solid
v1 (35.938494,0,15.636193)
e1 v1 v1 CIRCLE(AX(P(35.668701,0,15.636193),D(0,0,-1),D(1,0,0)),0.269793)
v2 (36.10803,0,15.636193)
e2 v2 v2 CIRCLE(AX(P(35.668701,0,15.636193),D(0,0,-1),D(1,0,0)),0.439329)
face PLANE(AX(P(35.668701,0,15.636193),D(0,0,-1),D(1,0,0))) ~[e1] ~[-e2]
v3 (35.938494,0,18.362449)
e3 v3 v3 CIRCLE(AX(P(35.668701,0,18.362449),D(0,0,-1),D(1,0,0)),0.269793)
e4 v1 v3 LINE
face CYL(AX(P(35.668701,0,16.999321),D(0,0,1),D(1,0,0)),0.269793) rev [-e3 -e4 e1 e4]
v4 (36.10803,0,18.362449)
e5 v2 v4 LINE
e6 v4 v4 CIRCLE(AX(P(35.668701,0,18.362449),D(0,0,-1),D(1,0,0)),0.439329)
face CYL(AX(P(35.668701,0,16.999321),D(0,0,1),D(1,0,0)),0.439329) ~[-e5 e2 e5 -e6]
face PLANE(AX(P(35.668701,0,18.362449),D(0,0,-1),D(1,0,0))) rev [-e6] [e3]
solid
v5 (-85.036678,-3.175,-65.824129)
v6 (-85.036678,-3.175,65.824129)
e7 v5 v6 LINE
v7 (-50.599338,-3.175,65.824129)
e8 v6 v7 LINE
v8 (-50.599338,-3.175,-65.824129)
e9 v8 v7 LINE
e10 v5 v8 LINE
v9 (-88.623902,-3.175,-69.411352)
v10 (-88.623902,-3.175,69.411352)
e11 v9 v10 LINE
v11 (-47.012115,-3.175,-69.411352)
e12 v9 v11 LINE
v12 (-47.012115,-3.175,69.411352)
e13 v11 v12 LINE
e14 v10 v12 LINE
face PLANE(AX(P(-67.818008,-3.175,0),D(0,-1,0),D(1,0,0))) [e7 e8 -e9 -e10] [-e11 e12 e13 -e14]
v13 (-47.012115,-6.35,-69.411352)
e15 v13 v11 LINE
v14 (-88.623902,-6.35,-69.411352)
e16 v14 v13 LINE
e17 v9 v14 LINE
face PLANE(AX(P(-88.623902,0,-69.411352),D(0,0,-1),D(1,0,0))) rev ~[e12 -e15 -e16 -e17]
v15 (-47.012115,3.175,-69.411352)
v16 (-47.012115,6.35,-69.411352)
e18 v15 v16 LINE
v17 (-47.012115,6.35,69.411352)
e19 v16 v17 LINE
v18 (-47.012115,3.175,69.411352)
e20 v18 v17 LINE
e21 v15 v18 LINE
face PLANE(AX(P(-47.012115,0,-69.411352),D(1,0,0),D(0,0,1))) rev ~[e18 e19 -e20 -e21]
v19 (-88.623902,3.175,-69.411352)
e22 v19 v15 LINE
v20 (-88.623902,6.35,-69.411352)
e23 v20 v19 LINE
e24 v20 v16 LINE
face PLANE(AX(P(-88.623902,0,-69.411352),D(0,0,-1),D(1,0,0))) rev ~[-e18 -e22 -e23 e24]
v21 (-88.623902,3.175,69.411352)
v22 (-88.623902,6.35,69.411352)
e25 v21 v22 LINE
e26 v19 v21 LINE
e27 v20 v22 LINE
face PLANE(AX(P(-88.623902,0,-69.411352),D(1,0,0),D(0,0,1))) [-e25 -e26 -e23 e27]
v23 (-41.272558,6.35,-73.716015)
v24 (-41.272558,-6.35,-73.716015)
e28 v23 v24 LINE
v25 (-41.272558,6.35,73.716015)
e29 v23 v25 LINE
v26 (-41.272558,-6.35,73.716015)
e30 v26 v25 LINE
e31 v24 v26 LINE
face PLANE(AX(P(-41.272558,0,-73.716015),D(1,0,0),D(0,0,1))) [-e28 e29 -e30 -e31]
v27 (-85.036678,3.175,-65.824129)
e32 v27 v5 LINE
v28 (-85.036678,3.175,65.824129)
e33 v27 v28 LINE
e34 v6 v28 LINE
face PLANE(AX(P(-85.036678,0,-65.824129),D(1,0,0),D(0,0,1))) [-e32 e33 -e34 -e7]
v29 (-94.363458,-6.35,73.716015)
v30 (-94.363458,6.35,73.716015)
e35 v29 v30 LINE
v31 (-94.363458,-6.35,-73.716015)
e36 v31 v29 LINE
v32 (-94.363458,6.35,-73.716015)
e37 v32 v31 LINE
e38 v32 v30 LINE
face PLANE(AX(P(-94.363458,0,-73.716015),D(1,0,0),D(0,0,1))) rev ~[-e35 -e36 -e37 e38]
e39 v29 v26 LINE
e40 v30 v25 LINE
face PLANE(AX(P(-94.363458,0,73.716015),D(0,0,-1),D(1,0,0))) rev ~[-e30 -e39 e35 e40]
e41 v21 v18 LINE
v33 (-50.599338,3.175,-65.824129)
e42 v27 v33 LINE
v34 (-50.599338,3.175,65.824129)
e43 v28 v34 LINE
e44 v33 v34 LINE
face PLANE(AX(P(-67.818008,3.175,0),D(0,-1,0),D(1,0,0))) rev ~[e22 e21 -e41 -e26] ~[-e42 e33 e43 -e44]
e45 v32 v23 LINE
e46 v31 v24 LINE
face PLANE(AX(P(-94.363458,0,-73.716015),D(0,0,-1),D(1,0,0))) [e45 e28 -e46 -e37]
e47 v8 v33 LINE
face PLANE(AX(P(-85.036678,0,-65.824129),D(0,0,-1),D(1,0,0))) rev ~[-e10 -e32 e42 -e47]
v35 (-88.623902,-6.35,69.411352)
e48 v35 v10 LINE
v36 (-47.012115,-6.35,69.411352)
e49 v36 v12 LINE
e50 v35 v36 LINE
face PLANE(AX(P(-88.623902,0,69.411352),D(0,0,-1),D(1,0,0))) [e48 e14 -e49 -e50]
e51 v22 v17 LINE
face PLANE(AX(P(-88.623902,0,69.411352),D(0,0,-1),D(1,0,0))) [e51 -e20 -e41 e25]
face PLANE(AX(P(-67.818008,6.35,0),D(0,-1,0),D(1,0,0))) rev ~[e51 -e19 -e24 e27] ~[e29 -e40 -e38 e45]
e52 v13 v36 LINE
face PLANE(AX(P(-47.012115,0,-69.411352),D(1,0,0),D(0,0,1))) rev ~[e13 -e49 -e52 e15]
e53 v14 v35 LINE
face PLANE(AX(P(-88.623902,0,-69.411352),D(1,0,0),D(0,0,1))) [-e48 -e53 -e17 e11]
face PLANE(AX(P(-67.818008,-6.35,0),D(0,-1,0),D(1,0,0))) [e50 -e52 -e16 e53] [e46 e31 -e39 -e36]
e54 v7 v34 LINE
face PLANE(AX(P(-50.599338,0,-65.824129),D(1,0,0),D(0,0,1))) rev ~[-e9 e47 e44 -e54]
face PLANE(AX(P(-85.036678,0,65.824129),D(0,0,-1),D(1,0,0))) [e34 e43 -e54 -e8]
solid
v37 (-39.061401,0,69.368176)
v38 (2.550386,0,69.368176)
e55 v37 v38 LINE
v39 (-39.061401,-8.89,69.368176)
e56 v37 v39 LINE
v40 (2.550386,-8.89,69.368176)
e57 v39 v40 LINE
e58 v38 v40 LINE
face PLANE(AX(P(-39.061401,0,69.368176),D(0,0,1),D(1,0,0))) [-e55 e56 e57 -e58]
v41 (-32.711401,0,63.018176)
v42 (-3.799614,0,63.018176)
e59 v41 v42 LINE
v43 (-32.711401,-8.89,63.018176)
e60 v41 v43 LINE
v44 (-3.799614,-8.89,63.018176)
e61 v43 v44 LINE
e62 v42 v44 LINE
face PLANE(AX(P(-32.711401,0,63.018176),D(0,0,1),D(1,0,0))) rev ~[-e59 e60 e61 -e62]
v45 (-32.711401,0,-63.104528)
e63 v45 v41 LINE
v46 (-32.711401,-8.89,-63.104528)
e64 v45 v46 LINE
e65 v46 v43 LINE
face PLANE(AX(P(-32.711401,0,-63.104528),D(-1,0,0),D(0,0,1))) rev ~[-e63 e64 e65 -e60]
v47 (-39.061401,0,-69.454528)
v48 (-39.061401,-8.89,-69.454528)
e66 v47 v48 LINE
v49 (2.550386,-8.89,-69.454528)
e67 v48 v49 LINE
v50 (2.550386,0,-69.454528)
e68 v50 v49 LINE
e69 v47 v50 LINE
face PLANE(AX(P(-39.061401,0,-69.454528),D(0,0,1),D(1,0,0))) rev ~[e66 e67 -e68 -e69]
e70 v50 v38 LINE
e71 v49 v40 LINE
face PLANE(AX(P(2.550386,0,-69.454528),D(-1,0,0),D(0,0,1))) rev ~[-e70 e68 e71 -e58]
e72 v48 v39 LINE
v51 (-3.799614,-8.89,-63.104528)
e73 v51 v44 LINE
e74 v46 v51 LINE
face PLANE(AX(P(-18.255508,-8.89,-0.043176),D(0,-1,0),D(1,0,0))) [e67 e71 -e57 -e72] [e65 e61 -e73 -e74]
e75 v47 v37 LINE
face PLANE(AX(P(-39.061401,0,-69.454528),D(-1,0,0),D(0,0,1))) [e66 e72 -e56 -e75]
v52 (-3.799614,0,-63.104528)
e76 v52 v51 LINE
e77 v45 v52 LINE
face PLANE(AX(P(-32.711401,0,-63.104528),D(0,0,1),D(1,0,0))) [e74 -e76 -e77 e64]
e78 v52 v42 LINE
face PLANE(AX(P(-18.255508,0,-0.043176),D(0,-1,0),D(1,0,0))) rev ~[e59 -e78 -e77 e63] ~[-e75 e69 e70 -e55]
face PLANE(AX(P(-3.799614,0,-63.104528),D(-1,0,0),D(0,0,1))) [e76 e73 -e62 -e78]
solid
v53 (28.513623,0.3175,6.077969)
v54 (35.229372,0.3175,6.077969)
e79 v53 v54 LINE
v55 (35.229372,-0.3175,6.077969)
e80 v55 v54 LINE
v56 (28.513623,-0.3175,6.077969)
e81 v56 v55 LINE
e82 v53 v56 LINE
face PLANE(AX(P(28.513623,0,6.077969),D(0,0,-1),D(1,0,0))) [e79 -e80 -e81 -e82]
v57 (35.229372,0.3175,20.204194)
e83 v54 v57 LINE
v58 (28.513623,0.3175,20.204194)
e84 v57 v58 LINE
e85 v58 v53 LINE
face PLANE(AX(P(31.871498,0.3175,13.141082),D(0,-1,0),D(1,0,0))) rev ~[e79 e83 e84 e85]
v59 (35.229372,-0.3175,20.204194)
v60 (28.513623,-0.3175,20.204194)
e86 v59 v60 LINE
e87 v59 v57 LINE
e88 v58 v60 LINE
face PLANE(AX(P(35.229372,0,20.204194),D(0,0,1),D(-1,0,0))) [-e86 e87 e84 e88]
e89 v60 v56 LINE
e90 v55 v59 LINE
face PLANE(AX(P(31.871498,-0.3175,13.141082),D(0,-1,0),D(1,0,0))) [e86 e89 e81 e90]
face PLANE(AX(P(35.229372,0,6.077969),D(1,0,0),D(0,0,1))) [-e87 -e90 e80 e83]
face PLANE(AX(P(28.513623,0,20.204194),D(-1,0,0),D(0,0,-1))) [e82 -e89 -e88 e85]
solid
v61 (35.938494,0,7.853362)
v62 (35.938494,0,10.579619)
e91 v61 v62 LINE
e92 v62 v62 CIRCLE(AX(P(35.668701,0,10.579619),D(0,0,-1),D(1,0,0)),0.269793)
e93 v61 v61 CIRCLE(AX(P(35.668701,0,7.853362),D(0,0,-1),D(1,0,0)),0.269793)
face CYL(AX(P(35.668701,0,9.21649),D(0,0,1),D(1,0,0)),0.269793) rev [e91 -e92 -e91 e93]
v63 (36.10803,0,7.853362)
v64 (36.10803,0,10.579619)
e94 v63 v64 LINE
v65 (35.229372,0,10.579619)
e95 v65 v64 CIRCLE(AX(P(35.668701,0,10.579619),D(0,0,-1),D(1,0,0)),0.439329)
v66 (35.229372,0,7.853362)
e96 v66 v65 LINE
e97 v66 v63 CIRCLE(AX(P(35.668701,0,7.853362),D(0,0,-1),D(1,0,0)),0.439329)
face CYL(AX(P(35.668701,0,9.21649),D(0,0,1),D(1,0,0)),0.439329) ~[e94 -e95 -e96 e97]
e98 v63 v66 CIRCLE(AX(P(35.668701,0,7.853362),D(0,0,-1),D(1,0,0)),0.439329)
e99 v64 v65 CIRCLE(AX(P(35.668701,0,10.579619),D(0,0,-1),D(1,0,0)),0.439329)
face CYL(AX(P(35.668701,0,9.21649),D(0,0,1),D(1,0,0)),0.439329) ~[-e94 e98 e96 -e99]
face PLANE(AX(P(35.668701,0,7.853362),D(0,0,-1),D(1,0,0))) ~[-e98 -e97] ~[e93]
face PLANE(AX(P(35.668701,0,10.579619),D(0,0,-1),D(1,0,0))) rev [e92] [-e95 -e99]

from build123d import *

# Parameters (mm, degrees)
F0_W     = 41.6117869318
F0_H     = 138.8227045536
F0_W_2   = 34.4373397529
F0_H_2   = 131.6482573748
F1_DEPTH = 3.175
F0_W_3   = 53.0909001827
F0_H_3   = 147.4320292473
F2_DEPTH = 6.35
F3_W     = 41.6117869318
F3_H     = 138.8227045536
F3_W_2   = 28.9117869318
F3_H_2   = 126.1227045536
F4_DEPTH = 8.89
F5_W     = 0.1695360988
F5_H     = 2.7262568474
F7_DEPTH = 0.3175


# Not quite as in the source:
# - a feature names something its author has since deleted; it is built from what else it names


with BuildPart() as f1:
    # F0 (on Front) → F1 (new body, symmetric)
    with BuildSketch(Plane.XZ):
        with Locations((-67.8180083632, 0)):
            Rectangle(F0_W, F0_H)
        with Locations((-67.8180083632, 0)):
            Rectangle(F0_W_2, F0_H_2, mode=Mode.SUBTRACT)
    extrude(amount=F1_DEPTH, both=True)

    # F0 (on Front) → F2 (join, symmetric)
    with BuildSketch(Plane.XZ):
        with Locations((-67.8180083632, 0)):
            Rectangle(F0_W_3, F0_H_3)
        with Locations((-67.8180083632, 0)):
            Rectangle(F0_W, F0_H, mode=Mode.SUBTRACT)
    extrude(amount=F2_DEPTH, both=True)


with BuildPart() as f4:
    # F3 (on Front) → F4 (new body)
    with BuildSketch(Plane.XZ):
        with Locations((-18.2555075735, -0.0431761146)):
            Rectangle(F3_W, F3_H)
        with Locations((-18.2555075735, -0.0431761146)):
            Rectangle(F3_W_2, F3_H_2, mode=Mode.SUBTRACT)
    extrude(amount=F4_DEPTH)


with BuildPart() as f6:
    # F5 (on Front) → F6 (revolve)
    with BuildSketch(Plane.XZ):
        with Locations((36.0232619569, 16.9993210584)):
            Rectangle(F5_W, F5_H)
    revolve(axis=Axis((35.6687009335, 0, 16.9993210584), (0, 0, -1)))


with BuildPart() as f7:
    # F5 (on Front) → F7 (new body, symmetric)
    with BuildSketch(Plane.XZ):
        Polygon((35.2293718606, 20.2041938901), (28.5136234015, 20.2041938901), (28.5136234015, 6.0779694468), (35.2293718606, 6.0779694468), (35.2293718606, 7.853361778), (35.2293718606, 10.5796186253), (35.2293718606, 15.6361926347), (35.2293718606, 18.3624494821), align=None)
    extrude(amount=F7_DEPTH, both=True)

    # F5 (on Front) → F8 (revolve)
    with BuildSketch(Plane.XZ):
        with Locations((36.0232619569, 9.2164902017)):
            Rectangle(F5_W, F5_H)
    revolve(axis=Axis((35.6687009335, 0, 9.2164902017), (0, 0, -1)))


solid = Compound([f1.part, f4.part, f6.part, f7.part])
